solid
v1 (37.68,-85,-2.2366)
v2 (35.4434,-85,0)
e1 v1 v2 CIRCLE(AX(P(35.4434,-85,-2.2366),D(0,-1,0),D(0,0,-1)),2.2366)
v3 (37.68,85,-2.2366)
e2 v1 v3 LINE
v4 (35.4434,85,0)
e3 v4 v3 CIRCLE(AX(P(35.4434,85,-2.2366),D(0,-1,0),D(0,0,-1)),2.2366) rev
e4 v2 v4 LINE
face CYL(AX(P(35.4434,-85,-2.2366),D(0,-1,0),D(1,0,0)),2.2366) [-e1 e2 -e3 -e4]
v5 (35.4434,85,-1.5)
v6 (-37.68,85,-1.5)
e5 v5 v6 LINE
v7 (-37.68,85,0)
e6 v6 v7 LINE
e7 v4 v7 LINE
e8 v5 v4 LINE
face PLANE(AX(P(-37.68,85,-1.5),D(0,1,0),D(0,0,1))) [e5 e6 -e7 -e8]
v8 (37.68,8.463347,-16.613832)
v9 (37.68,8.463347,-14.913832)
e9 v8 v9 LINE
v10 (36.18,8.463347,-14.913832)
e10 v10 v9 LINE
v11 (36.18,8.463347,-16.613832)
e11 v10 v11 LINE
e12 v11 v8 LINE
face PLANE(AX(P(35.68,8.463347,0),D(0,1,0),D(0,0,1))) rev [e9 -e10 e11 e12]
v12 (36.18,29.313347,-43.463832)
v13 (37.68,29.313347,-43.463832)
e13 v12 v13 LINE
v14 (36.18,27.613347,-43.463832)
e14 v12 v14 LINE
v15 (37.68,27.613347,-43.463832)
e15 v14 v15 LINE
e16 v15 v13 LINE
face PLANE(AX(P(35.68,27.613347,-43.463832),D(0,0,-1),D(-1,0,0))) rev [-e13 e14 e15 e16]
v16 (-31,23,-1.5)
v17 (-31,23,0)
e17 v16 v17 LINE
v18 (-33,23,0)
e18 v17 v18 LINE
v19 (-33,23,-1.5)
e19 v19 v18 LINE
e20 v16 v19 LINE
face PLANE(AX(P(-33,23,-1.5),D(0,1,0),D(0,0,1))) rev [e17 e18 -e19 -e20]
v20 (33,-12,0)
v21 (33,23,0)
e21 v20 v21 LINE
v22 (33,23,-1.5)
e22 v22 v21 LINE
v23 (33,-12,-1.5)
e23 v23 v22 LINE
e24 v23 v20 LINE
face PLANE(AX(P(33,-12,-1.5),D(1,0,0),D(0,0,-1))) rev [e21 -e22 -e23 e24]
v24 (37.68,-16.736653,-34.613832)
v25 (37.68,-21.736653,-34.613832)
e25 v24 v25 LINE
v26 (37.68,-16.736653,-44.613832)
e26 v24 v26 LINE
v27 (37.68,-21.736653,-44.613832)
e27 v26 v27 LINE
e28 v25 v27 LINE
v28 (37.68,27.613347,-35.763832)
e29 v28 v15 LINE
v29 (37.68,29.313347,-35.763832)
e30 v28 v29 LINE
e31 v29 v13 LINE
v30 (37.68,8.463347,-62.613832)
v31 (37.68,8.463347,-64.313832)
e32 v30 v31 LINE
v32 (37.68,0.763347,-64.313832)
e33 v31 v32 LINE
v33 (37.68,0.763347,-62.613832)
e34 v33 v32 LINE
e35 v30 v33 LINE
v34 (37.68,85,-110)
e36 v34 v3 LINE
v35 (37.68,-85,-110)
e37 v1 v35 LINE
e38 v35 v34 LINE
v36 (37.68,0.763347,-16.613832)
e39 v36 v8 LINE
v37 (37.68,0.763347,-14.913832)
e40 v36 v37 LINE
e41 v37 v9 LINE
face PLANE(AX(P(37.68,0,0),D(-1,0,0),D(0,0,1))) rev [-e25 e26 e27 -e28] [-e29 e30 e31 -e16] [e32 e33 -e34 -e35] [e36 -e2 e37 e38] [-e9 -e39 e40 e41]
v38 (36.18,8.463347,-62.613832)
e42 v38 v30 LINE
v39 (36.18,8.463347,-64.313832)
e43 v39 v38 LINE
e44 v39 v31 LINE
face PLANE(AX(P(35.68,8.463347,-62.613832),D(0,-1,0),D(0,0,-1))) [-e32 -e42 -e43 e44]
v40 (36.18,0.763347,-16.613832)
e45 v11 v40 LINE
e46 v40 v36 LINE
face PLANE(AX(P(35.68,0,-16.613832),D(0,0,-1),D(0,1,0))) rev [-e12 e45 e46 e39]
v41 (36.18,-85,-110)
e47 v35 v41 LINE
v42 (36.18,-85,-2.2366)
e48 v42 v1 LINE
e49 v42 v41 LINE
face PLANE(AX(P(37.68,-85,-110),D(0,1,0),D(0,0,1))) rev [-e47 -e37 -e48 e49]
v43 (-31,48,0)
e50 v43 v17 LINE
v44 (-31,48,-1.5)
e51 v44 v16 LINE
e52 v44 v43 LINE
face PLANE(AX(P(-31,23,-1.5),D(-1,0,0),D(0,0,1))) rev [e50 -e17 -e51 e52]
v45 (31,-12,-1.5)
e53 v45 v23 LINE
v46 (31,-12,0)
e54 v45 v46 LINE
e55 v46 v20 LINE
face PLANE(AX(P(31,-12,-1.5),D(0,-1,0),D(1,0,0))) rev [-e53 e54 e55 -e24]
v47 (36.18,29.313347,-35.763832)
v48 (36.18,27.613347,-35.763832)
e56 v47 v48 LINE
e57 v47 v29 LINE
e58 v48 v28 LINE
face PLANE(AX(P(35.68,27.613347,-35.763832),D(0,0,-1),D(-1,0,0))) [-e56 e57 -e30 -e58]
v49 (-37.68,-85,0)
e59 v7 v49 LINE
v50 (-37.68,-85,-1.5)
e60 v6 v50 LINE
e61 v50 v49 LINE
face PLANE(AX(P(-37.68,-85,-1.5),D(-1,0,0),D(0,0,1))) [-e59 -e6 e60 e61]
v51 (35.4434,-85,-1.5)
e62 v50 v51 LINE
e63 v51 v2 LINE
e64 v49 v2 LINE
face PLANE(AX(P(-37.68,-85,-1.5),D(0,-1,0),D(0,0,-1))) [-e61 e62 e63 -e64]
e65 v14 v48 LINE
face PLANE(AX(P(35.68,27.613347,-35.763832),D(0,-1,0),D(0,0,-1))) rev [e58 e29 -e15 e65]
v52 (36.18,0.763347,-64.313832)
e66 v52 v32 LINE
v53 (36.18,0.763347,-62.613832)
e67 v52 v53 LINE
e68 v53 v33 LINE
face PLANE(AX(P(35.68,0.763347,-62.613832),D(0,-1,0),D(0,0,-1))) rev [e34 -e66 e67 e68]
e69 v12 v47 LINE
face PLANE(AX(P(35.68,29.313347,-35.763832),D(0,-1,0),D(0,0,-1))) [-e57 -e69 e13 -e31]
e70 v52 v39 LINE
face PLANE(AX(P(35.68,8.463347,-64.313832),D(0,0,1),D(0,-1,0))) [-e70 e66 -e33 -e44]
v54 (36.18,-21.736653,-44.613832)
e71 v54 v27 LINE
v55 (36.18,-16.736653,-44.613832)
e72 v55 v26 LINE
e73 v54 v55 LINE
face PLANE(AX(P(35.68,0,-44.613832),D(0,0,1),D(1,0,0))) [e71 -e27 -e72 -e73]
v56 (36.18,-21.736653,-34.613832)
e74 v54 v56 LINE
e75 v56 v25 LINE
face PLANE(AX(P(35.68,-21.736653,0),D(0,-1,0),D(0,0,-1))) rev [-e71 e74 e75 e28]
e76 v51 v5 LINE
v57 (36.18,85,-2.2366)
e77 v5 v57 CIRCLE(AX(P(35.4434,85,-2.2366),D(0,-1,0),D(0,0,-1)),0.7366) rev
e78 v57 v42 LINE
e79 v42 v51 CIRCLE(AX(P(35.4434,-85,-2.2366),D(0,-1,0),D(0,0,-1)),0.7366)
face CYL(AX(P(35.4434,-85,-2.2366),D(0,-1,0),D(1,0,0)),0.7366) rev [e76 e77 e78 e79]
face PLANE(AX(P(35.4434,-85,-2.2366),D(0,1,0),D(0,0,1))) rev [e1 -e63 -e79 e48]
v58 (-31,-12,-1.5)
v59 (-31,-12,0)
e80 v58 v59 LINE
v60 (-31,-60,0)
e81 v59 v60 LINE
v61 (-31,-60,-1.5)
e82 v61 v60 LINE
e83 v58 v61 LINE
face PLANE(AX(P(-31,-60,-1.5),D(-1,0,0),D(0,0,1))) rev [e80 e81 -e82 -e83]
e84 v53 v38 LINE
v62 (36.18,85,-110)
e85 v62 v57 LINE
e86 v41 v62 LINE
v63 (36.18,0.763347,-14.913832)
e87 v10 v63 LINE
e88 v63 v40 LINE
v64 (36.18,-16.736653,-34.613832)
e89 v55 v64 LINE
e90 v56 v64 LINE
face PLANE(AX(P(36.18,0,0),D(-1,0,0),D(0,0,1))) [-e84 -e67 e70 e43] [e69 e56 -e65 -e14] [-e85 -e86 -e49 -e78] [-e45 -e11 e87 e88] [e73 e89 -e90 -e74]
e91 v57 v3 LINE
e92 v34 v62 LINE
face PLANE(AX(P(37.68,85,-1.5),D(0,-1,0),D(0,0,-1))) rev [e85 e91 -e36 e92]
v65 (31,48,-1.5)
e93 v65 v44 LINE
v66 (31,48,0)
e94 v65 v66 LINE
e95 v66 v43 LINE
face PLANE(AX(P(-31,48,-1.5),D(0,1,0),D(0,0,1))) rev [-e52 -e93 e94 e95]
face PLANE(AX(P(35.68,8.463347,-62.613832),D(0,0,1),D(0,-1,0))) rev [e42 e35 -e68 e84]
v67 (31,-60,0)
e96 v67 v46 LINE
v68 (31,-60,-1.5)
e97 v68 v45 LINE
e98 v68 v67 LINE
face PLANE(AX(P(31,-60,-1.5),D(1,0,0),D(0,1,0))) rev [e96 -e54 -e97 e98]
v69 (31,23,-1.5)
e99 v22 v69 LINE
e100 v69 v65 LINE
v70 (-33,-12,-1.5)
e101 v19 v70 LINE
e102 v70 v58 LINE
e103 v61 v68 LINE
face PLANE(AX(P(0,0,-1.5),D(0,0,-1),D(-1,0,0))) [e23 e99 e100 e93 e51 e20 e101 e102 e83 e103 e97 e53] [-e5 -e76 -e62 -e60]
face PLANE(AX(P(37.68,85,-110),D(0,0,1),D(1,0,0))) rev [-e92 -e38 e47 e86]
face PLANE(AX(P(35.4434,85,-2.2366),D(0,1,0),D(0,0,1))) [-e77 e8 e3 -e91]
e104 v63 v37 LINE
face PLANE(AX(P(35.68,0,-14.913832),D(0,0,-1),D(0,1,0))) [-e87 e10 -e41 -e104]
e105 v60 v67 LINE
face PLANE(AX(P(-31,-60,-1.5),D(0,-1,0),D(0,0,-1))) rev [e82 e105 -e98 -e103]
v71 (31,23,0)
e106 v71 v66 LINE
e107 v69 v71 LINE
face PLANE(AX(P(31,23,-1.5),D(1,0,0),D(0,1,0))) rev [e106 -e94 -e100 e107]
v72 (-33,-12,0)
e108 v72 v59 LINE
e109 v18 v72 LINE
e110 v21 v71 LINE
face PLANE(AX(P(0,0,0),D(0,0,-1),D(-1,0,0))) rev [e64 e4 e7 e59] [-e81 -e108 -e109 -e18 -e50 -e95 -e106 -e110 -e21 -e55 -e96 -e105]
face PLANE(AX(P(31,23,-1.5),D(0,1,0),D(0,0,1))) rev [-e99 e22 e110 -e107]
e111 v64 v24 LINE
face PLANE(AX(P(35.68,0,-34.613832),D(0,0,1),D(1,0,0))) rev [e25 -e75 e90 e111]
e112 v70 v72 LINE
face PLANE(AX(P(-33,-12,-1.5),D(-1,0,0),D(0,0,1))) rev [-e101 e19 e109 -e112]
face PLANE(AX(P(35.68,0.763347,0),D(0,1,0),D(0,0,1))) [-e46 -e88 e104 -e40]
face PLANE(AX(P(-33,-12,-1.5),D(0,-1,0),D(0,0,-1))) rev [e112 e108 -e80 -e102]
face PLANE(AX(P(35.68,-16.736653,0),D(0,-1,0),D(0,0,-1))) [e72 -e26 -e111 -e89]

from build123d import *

# Parameters (mm, degrees)
SKETCH1_W                    = 75.36
SKETCH1_H                    = 170
BASE_FLANGE1_DEPTH           = 1.5
EDGE_FLANGE1_STRIP_W         = 7.4732
EDGE_FLANGE1_STRIP_H         = 1.5
EDGE_FLANGE1_STRIP_CUT_DEPTH = 170
EDGE_FLANGE1_DEPTH           = 170
SKETCH11_W                   = 1.7
SKETCH11_H                   = 7.7
SKETCH11_W_2                 = 7.7
SKETCH11_H_2                 = 1.7
SKETCH11_W_3                 = 10
SKETCH11_H_3                 = 5
CUT_EXTRUDE2_DEPTH           = 2


# Sheet-metal steps are written as plain solids
with BuildPart() as part:
    # Sketch1 → Base-Flange1 (new body)
    with BuildSketch(Plane.XY):
        Rectangle(SKETCH1_W, SKETCH1_H)
        Polygon((-31, 23), (-31, 48), (31, 48), (31, 23), (33, 23), (33, -12), (31, -12), (31, -60), (-31, -60), (-31, -12), (-33, -12), (-33, 23), align=None, mode=Mode.SUBTRACT)
    extrude(amount=-BASE_FLANGE1_DEPTH)

    # Edge-Flange1 strip (across the edge) → Edge-Flange1 strip cut (cut)
    with BuildSketch(Plane(origin=(37.68, 85, -1.5), x_dir=(-1, 0, 0), z_dir=(0, -1, 0))):
        with Locations((-1.5, -0.75)):
            Rectangle(EDGE_FLANGE1_STRIP_W, EDGE_FLANGE1_STRIP_H)
    extrude(amount=EDGE_FLANGE1_STRIP_CUT_DEPTH, mode=Mode.SUBTRACT)

    # Edge-Flange1 section (across the edge) → Edge-Flange1 (add)
    with BuildSketch(Plane(origin=(37.68, 85, -1.5), x_dir=(-1, 0, 0), z_dir=(0, -1, 0))):
        with BuildLine():
            Line((0, 0.7366), (0, 108.5))
            Line((0, 108.5), (1.5, 108.5))
            Line((1.5, 108.5), (1.5, 0.7366))
            ThreePointArc((1.5, 0.7366), (1.715745145, 0.215745145), (2.2366, 0))
            Line((2.2366, 0), (2.2366, -1.5))
            ThreePointArc((2.2366, -1.5), (0.655084973, -0.844915027), (0, 0.7366))
        make_face()
    extrude(amount=EDGE_FLANGE1_DEPTH)

    # Sketch11 → Cut-Extrude2 (cut)
    with BuildSketch(Plane(origin=(37.68, 0, 0), x_dir=(0, 0, -1), z_dir=(1, 0, 0))):
        with Locations((63.463831766, 4.61334704)):
            Rectangle(SKETCH11_W, SKETCH11_H)
        with Locations((39.613831766, 28.46334704)):
            Rectangle(SKETCH11_W_2, SKETCH11_H_2)
        with Locations((15.763831766, 4.61334704)):
            Rectangle(SKETCH11_W, SKETCH11_H)
        with Locations((39.613831766, -19.23665296)):
            Rectangle(SKETCH11_W_3, SKETCH11_H_3)
    extrude(amount=-CUT_EXTRUDE2_DEPTH, mode=Mode.SUBTRACT)


solid = part.part
